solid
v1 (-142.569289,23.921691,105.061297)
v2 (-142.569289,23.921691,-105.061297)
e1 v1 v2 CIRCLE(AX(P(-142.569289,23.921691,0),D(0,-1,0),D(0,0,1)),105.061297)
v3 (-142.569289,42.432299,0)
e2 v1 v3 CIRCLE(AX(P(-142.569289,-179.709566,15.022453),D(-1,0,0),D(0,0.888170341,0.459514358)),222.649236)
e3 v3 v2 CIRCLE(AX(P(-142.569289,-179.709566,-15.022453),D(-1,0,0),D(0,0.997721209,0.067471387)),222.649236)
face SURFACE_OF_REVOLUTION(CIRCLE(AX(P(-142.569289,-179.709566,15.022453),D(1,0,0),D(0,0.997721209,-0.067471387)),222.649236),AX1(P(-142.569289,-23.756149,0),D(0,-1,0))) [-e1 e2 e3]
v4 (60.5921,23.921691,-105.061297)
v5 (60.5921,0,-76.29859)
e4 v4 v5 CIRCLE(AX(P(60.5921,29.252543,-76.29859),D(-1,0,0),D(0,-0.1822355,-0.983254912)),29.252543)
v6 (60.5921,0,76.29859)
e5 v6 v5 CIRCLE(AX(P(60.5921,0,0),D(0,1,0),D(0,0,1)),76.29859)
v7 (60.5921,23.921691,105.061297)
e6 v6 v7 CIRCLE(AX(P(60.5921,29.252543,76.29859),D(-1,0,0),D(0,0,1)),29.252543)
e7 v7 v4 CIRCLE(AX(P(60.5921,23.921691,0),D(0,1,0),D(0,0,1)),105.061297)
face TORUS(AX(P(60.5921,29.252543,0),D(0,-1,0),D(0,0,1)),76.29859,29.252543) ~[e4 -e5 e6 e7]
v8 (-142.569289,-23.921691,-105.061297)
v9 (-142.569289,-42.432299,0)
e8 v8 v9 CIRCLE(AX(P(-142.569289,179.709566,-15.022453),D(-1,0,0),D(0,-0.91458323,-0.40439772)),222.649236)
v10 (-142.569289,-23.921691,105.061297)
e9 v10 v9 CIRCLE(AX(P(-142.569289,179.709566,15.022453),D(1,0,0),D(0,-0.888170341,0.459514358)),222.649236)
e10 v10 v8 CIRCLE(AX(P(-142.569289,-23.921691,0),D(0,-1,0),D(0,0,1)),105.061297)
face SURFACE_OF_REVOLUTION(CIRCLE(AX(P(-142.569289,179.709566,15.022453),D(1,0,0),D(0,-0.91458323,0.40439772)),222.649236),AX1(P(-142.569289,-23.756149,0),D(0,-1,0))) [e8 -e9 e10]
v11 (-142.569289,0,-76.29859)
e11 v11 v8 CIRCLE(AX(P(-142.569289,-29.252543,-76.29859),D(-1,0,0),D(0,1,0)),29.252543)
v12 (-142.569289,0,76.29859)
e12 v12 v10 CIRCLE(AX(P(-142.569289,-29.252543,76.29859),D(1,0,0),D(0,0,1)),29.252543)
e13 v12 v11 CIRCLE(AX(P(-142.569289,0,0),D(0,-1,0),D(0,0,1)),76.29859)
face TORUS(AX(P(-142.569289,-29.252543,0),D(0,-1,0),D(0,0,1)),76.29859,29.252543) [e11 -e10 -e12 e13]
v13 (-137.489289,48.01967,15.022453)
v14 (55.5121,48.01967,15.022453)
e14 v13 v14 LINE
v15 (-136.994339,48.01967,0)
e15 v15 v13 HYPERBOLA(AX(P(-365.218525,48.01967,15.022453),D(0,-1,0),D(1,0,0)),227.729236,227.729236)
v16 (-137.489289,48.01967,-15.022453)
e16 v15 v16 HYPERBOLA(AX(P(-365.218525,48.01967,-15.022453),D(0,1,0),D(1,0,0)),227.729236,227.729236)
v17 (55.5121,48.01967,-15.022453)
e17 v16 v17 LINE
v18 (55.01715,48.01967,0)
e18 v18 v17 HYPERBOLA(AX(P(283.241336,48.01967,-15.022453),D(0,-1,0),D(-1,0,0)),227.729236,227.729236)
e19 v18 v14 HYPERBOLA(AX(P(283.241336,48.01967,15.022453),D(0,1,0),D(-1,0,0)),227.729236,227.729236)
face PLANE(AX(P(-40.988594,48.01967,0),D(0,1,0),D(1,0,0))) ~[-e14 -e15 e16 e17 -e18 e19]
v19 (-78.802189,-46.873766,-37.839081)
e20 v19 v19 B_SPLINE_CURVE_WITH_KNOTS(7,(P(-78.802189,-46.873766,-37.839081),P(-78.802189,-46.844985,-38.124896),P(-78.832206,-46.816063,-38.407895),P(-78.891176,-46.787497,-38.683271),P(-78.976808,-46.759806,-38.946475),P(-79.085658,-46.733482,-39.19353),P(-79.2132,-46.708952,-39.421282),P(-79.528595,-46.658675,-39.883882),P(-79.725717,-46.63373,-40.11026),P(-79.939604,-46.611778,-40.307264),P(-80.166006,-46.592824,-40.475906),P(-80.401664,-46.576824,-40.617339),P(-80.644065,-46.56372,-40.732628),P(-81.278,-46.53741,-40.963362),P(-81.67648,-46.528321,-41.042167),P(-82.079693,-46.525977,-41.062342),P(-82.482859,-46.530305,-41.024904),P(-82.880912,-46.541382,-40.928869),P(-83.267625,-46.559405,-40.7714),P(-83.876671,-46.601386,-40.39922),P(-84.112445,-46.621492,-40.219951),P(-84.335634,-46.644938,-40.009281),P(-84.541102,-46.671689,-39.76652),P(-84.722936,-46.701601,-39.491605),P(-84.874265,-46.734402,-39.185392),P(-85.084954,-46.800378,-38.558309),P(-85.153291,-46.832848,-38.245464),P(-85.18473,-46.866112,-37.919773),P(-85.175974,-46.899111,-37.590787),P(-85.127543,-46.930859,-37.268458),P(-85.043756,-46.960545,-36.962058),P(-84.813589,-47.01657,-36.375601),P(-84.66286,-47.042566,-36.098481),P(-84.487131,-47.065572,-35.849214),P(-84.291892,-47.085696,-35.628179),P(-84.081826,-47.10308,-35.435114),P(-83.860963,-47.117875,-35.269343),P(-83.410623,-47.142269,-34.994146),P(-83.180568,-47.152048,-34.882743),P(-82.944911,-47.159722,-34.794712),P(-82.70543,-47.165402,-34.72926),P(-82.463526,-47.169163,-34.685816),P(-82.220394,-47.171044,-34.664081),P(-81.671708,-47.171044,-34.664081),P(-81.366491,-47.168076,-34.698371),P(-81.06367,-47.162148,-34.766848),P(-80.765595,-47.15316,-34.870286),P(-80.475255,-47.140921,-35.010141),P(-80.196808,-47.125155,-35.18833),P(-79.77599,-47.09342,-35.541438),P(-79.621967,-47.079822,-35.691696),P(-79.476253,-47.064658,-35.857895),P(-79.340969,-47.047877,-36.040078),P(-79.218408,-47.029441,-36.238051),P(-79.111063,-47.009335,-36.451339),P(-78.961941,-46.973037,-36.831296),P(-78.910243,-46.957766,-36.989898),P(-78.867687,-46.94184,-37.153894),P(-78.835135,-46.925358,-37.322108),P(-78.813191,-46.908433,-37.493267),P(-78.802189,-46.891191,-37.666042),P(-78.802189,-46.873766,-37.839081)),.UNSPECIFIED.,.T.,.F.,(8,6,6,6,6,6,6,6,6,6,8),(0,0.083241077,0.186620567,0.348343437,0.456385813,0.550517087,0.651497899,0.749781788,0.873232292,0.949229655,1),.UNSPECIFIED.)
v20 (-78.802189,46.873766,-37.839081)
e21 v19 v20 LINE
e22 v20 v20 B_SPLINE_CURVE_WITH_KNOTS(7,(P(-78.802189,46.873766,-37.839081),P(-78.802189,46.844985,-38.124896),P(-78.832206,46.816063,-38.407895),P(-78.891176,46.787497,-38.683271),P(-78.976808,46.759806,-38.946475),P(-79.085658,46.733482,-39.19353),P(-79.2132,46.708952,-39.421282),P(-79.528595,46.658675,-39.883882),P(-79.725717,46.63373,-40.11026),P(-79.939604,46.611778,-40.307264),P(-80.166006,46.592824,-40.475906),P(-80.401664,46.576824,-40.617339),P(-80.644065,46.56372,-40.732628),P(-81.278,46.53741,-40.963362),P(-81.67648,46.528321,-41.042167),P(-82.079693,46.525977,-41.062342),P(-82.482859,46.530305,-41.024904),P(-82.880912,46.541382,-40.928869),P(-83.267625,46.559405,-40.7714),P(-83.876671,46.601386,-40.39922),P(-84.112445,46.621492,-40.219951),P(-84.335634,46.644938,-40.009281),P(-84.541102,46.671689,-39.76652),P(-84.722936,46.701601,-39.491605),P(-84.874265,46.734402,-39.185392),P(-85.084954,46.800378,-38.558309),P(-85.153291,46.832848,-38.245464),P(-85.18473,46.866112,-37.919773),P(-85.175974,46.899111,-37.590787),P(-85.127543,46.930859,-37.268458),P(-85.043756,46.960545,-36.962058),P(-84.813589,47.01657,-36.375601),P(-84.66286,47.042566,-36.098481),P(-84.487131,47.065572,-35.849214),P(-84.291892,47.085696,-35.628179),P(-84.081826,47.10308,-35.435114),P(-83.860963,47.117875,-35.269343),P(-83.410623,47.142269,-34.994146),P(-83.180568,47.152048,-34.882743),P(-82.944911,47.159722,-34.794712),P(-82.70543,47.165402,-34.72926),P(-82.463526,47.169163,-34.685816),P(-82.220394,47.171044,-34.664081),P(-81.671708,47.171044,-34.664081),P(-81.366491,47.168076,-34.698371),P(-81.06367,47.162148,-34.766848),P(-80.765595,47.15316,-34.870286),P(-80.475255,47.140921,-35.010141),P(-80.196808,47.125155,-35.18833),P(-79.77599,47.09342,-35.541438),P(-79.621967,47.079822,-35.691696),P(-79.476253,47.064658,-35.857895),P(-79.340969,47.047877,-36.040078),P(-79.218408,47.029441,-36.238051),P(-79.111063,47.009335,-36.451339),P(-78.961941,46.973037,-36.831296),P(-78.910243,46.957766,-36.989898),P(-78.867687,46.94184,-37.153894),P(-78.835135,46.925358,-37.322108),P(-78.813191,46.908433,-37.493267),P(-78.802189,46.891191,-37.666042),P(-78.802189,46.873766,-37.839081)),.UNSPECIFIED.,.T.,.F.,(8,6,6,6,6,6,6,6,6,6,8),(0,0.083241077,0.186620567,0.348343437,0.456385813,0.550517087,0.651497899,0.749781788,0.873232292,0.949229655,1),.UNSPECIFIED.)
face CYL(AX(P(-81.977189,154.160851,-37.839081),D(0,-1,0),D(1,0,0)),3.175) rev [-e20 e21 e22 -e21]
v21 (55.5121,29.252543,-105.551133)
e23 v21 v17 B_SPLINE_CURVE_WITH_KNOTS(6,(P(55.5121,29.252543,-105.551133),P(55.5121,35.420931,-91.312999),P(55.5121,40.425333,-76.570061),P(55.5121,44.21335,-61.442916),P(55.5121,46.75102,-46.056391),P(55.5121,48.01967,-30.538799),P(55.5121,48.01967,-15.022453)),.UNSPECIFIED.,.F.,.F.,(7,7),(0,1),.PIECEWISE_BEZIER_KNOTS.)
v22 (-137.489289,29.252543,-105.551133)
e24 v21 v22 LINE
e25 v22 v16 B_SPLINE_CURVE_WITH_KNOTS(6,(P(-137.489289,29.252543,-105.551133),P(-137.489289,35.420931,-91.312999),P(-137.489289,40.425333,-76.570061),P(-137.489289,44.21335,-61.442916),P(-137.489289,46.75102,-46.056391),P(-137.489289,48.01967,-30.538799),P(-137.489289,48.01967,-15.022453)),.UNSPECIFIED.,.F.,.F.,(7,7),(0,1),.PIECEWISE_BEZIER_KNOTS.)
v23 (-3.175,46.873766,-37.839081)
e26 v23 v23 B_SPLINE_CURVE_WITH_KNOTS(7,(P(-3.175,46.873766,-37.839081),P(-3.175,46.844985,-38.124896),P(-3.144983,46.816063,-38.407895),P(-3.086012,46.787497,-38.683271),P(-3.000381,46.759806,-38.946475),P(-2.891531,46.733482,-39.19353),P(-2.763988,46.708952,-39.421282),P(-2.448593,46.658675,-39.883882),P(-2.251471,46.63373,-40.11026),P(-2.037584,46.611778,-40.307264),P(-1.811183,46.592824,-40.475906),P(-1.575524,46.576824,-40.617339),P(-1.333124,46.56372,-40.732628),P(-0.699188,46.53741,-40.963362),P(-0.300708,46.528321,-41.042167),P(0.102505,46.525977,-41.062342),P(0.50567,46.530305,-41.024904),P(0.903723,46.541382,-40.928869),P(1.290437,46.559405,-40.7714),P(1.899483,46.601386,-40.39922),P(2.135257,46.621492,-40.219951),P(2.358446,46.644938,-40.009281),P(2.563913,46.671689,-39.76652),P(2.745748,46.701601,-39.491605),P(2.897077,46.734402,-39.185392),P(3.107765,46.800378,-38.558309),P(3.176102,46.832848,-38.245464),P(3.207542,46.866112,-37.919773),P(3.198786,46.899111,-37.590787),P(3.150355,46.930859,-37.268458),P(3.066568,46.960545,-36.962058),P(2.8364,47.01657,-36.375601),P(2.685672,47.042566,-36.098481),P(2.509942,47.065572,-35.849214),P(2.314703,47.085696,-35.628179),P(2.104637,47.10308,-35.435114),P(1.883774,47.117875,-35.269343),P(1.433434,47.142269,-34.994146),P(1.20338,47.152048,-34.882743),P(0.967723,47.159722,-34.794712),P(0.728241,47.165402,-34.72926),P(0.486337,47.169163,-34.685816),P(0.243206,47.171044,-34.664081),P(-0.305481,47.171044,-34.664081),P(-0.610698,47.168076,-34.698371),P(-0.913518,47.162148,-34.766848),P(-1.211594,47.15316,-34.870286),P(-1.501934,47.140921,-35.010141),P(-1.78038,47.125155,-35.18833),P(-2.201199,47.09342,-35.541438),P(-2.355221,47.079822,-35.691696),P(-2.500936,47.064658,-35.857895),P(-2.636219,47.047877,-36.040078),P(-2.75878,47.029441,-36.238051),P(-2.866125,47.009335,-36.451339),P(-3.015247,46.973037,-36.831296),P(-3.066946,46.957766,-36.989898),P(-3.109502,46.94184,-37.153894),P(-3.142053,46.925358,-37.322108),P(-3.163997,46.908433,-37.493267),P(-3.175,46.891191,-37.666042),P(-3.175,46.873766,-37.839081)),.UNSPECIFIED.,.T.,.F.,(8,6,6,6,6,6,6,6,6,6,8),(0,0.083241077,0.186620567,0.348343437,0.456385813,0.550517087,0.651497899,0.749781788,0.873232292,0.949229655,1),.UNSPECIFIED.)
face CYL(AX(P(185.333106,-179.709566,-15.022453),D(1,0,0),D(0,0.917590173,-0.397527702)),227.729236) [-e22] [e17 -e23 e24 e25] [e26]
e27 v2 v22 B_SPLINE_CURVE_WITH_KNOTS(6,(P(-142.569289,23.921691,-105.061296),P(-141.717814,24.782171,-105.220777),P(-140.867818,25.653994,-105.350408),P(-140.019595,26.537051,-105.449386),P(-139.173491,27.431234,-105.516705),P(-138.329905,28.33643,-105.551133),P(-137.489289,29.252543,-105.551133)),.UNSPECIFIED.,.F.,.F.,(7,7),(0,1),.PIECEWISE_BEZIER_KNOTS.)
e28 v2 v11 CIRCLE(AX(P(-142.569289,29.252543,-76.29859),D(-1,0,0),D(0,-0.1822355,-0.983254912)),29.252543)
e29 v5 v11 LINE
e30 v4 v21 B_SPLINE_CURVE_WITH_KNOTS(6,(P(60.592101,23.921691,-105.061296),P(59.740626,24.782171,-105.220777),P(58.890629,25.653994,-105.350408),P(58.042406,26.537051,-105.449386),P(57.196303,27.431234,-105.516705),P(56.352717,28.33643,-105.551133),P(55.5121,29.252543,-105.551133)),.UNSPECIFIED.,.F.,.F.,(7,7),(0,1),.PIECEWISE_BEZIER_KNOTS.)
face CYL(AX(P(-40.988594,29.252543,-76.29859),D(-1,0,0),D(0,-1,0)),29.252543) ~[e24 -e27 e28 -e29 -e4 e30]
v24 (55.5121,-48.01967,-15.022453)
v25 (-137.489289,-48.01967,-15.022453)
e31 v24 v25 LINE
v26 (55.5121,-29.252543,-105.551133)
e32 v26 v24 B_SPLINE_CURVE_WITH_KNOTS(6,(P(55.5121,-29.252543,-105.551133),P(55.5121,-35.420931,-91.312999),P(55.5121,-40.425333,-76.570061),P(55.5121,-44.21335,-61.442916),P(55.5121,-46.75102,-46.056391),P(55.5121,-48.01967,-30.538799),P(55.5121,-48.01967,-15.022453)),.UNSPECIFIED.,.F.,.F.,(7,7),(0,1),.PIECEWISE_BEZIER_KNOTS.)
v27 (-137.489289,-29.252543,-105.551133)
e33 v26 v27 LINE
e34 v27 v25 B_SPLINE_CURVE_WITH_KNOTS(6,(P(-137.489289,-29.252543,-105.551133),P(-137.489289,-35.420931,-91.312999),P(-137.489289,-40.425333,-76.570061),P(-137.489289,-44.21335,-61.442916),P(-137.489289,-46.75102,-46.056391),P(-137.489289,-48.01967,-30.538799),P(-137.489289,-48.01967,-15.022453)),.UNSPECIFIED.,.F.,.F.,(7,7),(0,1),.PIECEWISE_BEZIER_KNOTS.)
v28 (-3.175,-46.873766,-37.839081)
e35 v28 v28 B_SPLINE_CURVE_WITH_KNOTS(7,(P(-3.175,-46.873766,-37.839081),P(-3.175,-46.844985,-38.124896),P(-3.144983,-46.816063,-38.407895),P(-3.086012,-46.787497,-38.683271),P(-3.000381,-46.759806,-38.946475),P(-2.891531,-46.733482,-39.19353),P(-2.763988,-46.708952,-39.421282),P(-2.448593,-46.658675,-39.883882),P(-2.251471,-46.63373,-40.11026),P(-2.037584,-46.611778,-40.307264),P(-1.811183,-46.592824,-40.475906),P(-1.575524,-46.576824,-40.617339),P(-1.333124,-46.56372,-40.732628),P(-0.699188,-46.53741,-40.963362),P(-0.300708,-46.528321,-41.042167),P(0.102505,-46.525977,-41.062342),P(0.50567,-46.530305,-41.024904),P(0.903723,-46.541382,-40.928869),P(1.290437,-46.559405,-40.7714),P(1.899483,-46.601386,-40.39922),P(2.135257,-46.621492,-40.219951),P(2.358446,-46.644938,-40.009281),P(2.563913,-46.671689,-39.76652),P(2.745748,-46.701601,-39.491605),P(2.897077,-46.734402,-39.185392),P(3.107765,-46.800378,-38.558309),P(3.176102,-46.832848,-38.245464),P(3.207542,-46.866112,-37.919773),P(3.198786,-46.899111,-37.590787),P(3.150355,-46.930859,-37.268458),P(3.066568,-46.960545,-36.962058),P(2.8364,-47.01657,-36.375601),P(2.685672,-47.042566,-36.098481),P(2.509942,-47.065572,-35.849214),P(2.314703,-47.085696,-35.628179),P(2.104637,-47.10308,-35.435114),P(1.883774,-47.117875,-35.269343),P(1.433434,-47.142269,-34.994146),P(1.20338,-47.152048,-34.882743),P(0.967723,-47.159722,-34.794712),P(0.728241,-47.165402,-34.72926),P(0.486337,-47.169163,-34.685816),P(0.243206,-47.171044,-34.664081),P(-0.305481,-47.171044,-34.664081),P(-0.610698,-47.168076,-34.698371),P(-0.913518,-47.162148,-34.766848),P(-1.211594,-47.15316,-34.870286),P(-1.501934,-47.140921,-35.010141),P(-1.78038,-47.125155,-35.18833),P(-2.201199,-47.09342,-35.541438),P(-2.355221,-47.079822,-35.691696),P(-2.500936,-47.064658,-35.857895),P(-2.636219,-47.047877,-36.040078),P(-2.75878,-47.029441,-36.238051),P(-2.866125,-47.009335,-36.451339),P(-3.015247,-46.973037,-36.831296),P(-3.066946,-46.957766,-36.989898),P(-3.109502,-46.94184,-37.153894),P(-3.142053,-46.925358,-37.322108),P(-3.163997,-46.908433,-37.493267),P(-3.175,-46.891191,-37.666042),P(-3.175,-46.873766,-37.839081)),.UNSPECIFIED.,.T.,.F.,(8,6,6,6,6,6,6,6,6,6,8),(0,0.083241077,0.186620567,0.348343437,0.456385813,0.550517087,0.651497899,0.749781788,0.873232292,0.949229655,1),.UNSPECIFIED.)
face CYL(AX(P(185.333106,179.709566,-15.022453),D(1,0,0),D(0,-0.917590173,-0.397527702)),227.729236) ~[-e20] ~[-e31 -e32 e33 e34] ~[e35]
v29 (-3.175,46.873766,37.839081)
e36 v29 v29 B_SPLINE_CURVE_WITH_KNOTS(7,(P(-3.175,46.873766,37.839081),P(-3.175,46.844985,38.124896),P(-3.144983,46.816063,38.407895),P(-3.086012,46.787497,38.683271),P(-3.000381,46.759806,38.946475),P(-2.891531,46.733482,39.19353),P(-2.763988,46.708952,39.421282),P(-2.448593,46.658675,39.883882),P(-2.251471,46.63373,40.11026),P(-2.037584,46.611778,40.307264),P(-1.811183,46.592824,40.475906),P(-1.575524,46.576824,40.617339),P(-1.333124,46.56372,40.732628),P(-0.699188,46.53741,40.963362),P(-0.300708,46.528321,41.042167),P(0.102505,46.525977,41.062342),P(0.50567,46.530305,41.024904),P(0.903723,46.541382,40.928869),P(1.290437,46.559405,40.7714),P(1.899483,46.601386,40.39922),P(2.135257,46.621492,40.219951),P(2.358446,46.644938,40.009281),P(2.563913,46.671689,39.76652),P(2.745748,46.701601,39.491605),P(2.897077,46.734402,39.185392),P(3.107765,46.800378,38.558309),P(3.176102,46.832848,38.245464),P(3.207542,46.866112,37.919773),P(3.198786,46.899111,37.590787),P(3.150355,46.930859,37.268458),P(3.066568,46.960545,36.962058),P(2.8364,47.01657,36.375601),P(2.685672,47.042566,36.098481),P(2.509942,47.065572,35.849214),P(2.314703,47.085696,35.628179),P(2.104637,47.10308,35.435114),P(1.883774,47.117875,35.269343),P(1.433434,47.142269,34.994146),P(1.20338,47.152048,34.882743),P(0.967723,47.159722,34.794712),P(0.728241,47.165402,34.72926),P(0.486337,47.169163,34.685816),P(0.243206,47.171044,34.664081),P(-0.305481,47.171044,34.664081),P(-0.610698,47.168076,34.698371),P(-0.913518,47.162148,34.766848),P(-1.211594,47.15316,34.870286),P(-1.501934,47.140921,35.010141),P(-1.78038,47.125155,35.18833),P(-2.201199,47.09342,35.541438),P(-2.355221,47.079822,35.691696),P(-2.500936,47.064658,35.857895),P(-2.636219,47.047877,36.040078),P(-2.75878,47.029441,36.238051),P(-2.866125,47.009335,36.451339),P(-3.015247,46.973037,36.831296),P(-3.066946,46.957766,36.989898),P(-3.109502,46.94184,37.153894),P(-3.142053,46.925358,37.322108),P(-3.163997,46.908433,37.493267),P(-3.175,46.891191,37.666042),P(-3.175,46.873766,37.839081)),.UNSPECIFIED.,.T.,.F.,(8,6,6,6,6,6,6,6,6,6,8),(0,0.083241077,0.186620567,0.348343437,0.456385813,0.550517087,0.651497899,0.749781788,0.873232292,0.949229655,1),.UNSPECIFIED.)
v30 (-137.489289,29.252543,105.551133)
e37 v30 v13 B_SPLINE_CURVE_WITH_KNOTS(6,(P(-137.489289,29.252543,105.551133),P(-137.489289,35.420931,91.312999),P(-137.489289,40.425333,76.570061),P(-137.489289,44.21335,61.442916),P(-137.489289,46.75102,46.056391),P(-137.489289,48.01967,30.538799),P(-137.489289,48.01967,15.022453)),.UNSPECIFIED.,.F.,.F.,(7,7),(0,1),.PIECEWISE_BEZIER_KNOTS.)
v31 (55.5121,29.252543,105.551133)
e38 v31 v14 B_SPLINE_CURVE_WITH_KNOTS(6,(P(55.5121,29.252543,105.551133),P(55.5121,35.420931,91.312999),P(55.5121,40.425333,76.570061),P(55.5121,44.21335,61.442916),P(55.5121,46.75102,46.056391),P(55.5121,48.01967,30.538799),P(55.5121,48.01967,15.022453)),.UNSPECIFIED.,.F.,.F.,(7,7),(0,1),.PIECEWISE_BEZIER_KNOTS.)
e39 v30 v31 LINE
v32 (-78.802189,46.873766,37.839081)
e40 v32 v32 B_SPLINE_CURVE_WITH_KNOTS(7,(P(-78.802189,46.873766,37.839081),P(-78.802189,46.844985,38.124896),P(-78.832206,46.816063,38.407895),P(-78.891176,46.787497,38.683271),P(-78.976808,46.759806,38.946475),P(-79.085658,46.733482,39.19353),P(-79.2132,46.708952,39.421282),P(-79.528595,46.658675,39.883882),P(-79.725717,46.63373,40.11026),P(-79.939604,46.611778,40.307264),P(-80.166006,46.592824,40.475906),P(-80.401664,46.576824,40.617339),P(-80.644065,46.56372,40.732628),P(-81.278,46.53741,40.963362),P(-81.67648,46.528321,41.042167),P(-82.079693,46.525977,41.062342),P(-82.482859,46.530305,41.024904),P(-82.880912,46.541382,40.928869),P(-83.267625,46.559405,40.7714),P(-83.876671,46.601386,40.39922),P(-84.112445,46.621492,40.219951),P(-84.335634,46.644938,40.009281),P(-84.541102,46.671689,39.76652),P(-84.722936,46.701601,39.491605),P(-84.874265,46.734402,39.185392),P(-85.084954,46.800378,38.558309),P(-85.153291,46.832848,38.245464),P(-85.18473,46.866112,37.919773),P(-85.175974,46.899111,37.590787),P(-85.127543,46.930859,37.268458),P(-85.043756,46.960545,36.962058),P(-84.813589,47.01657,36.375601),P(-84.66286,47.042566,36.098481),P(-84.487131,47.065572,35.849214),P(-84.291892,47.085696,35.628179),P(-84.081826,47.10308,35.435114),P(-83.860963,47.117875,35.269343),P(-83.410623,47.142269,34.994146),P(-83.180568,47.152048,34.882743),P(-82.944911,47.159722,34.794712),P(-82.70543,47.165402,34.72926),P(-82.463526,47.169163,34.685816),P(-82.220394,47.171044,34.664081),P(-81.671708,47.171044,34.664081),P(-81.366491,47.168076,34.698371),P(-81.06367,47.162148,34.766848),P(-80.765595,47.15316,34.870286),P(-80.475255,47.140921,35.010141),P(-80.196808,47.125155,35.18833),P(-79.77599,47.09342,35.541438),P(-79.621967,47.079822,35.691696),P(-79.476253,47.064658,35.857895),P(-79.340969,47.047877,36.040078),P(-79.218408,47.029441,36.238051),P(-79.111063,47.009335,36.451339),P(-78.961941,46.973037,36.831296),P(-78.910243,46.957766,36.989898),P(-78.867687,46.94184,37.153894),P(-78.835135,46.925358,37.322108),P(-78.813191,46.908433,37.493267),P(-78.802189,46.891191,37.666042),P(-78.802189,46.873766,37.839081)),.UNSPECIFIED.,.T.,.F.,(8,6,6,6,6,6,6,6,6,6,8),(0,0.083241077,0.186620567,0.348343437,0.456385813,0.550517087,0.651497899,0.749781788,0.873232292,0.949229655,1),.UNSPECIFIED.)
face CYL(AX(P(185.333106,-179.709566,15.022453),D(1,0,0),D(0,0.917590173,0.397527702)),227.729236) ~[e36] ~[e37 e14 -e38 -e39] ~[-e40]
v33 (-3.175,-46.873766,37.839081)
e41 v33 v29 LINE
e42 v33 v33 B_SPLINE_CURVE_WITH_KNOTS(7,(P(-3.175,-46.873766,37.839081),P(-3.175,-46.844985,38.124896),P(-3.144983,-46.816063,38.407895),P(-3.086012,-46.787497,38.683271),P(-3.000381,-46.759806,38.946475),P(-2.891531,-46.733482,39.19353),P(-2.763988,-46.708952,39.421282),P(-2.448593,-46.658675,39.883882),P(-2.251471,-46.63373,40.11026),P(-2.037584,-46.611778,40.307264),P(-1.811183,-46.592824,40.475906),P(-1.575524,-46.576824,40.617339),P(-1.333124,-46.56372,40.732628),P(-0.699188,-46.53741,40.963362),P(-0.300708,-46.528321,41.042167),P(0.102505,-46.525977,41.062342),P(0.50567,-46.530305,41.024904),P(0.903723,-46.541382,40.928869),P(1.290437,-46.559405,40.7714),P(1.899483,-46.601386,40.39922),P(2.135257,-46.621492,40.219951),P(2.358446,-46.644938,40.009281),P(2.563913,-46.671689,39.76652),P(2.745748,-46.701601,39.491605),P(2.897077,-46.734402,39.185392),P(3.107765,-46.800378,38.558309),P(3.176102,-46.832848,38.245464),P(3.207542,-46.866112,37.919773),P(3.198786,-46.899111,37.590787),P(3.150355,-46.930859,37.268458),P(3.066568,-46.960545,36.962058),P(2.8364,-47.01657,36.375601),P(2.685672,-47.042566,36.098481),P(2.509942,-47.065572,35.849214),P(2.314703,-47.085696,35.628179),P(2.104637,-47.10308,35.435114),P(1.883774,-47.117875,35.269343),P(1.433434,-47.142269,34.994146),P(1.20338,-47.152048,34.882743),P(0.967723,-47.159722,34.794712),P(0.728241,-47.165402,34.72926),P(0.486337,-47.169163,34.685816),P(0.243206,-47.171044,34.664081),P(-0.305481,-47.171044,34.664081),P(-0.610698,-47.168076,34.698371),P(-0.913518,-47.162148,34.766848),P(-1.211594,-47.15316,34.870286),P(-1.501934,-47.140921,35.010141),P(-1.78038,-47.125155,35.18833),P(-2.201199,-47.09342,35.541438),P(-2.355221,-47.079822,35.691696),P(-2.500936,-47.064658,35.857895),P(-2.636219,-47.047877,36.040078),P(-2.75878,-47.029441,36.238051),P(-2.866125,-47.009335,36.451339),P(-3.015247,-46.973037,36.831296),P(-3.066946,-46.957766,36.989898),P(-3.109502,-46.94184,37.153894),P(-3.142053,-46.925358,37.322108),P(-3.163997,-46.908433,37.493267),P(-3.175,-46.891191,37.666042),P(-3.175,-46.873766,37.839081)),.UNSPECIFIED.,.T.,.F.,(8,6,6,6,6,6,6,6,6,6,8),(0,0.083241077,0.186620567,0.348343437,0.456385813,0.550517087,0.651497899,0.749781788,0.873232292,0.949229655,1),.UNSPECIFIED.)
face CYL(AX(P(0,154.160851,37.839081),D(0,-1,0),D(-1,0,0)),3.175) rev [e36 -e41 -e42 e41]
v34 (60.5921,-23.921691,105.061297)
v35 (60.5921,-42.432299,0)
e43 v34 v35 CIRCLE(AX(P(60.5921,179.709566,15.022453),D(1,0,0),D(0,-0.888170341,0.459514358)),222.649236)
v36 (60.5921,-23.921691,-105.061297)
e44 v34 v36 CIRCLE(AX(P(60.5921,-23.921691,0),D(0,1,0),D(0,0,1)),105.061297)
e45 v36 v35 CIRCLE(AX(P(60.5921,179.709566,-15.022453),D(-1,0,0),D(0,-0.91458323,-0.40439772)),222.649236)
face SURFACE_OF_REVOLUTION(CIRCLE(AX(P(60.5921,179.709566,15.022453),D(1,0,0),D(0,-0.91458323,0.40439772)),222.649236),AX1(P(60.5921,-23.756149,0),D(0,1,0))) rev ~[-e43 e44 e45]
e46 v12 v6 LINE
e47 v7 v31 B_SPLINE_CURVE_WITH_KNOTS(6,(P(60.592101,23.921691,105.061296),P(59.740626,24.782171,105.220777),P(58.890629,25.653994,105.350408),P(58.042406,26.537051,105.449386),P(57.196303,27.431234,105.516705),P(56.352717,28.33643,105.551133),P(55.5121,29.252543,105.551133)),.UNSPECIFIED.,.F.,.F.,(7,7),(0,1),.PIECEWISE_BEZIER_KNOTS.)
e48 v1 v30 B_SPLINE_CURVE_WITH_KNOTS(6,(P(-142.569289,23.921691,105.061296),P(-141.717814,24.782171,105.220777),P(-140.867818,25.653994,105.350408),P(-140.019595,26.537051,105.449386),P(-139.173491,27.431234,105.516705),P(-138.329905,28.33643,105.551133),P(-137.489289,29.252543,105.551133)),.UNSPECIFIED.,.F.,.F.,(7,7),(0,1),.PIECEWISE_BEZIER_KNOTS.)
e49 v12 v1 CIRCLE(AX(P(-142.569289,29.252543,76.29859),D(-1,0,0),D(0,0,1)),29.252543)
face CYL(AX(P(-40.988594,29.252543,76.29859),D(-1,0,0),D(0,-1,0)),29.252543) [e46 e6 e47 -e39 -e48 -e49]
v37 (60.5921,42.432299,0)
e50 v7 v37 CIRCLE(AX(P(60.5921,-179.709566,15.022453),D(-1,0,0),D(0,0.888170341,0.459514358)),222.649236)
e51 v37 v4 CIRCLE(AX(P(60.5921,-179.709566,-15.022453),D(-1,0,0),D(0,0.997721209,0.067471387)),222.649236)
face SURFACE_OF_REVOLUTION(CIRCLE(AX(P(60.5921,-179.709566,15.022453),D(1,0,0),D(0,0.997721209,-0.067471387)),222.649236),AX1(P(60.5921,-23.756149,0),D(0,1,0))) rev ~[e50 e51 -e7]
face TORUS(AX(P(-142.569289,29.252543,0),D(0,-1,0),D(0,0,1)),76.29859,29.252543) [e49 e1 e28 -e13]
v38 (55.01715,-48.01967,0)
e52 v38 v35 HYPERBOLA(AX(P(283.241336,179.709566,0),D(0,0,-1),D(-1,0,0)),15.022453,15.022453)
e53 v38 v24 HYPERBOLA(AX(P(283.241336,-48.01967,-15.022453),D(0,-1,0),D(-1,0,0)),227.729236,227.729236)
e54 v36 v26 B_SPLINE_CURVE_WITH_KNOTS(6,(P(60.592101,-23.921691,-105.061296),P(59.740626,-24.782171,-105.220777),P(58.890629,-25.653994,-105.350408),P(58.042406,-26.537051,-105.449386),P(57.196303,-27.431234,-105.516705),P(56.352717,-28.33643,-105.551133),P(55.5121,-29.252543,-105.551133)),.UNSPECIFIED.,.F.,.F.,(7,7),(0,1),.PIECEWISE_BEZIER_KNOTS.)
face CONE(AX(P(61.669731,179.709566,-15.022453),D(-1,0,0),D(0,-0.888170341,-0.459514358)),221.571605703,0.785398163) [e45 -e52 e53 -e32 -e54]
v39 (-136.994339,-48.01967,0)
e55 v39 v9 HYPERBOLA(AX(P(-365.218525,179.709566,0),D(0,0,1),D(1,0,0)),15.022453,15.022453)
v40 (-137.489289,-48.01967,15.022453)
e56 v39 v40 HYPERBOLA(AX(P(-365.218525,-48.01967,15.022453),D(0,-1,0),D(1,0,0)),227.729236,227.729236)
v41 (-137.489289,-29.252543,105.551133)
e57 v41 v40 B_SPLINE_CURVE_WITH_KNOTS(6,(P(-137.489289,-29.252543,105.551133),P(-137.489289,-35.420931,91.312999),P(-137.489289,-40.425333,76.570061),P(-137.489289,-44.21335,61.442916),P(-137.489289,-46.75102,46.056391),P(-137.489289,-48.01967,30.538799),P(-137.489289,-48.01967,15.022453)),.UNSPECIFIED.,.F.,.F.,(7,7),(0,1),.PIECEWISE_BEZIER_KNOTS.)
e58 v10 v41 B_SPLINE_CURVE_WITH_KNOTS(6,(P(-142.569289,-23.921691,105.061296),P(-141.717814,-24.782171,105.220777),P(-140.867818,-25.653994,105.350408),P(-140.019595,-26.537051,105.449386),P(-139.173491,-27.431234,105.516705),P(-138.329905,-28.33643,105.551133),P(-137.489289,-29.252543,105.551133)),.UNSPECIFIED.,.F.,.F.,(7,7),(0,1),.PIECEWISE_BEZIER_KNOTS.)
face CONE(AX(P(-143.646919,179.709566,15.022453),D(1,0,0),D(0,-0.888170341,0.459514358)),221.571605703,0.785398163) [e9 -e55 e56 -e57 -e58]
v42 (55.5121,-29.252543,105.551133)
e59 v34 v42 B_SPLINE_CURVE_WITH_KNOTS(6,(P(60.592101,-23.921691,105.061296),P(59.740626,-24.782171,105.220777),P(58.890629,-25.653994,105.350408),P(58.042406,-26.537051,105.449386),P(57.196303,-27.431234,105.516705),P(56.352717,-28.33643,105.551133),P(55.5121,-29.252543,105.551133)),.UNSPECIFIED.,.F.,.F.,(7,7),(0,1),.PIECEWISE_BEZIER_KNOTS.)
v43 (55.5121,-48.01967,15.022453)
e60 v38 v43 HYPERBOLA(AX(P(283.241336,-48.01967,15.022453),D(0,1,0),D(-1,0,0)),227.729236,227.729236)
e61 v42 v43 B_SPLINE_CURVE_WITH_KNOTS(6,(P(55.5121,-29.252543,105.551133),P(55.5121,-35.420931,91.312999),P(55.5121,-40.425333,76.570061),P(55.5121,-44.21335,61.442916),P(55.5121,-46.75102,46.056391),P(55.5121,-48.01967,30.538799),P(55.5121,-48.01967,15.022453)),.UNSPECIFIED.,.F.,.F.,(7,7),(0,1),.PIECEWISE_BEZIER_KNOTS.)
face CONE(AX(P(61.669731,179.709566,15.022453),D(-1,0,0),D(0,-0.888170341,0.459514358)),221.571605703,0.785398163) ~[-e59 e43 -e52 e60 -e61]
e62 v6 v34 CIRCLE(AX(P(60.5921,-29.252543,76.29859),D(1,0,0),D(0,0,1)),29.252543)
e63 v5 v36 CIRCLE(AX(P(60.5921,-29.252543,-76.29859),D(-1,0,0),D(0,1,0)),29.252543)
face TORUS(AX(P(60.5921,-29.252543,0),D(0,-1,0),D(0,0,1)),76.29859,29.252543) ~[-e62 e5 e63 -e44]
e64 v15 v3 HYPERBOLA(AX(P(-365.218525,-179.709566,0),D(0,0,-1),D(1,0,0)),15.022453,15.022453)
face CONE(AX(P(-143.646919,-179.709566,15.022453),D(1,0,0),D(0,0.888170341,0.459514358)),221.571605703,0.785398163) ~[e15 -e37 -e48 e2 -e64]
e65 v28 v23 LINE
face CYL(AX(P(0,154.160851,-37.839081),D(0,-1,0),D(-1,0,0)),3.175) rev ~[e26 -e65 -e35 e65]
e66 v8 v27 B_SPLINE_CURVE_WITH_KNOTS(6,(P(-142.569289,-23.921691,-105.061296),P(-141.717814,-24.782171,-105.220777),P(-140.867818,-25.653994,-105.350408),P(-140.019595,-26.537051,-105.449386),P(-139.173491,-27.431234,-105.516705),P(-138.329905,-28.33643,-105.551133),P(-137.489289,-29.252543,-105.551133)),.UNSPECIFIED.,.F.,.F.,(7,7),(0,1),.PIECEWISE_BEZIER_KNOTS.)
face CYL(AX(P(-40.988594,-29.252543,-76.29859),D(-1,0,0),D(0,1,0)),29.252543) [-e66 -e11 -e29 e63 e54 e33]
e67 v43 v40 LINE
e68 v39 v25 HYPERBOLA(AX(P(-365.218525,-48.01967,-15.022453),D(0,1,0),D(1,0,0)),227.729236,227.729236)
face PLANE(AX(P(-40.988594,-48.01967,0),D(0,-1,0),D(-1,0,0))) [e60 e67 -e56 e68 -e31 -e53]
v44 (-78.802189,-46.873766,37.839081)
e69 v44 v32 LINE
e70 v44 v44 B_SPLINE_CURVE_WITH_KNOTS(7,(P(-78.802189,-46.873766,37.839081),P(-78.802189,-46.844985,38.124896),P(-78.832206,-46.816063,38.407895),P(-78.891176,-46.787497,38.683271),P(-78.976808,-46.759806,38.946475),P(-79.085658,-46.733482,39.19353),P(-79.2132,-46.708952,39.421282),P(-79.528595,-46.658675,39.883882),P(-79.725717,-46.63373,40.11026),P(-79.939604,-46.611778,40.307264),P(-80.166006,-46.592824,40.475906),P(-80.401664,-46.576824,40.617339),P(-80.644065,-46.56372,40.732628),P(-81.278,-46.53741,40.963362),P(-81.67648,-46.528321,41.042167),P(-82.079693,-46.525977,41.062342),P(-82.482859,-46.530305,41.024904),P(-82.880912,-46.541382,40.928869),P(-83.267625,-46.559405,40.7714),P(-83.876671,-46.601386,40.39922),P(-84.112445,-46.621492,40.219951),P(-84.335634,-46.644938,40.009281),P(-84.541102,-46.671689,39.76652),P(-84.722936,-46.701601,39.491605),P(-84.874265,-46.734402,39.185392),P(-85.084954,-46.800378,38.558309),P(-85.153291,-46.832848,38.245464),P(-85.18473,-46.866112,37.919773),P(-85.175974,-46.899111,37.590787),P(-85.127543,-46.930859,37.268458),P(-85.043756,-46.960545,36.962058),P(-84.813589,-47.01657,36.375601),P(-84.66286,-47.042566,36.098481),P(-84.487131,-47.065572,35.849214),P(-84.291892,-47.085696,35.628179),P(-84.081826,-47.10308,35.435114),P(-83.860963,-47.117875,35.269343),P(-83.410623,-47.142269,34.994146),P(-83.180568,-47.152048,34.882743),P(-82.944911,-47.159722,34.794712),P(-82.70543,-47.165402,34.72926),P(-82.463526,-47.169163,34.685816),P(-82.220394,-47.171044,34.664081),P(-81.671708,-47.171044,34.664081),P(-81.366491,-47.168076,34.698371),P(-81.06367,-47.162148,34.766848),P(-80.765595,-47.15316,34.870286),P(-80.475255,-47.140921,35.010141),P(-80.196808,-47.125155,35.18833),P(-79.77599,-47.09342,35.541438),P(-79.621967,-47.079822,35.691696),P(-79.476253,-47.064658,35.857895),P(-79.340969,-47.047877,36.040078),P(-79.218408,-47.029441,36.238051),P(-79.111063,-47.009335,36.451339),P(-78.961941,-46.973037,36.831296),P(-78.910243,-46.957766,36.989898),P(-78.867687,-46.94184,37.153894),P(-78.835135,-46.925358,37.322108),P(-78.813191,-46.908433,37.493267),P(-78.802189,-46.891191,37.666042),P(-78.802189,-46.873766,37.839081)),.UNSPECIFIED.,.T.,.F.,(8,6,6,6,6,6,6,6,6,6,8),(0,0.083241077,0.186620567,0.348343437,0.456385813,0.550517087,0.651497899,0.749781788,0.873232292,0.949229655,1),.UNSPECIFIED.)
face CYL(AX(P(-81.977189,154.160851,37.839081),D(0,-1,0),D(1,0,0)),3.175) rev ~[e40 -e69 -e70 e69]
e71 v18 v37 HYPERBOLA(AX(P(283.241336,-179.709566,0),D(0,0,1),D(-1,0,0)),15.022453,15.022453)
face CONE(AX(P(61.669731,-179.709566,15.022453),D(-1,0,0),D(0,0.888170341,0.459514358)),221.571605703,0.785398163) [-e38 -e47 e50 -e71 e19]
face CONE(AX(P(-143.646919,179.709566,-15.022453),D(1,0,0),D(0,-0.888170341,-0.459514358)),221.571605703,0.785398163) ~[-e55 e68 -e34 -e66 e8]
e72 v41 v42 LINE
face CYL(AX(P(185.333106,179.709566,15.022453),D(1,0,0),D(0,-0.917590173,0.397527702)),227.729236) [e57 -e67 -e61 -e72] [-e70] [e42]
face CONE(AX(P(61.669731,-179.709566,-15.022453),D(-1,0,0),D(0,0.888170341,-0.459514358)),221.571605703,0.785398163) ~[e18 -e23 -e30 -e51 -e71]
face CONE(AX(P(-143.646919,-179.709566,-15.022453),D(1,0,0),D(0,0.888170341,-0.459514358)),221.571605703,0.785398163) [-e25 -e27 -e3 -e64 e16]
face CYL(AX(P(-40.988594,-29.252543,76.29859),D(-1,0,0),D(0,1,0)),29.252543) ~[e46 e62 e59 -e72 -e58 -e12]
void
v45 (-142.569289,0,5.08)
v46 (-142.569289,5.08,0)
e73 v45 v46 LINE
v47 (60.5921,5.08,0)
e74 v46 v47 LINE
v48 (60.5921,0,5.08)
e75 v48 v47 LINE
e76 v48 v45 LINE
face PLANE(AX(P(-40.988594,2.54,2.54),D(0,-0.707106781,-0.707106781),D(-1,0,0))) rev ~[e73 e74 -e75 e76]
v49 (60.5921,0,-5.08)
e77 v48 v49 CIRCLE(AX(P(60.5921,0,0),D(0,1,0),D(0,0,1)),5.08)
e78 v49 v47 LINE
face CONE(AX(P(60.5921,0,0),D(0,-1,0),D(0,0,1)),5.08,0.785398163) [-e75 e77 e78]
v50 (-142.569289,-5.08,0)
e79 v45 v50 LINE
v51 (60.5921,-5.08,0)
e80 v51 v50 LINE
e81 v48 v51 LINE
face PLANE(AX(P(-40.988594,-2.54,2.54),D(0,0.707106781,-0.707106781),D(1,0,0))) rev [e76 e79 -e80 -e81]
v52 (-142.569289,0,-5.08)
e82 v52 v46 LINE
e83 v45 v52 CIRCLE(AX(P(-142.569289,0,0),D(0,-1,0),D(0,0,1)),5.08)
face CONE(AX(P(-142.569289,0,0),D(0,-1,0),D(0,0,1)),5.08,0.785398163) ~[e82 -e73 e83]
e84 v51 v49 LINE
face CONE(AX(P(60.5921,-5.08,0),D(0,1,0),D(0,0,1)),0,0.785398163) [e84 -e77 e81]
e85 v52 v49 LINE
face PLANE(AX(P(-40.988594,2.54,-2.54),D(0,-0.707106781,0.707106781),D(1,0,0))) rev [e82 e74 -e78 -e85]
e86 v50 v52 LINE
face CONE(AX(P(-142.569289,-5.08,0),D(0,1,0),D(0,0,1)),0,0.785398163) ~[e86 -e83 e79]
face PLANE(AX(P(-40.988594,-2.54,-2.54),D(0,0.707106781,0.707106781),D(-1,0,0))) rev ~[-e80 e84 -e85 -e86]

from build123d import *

# Parameters (mm, degrees)
F0_W        = 101.5806943178
F0_H        = 48.01966995
F1_DEPTH    = 105.5511329323
F2_R        = 29.2525430431
F3_T1_DEPTH = 554.2240944956
F4_SIZE     = 5.08
F5_T2_ANGLE = 31.2878347999
F7_D        = 6.35
F9_ANGLE    = 180


# Not quite as in the source:
# - a fillet or chamfer that OpenCascade refuses, or shapes differently, is made with other operations: its cross-section is extruded or revolved along the edge and cut away or added


with BuildPart() as f1:
    # F0 (on Top) → F1 (new body)
    with BuildSketch(Plane.XY):
        with Locations((9.8017528653, 24.009834975)):
            Rectangle(F0_W, F0_H)
    extrude(amount=F1_DEPTH)

    # F2
    f2_edges = [f1.edges().sort_by_distance(p)[0] for p in [
        (9.801753, 0, 105.551133),
    ]]
    fillet(f2_edges, radius=F2_R)

    # F3: fillet of radius 227.7292364389 on 1 edges, made by hand

    # F3_s2 → F3_t1 (cut)
    with BuildSketch(Plane.YZ.offset(-267.3102943825)):
        with BuildLine():
            ThreePointArc((29.2525430431, 105.5511329323), (43.2785349621, 61.2491955933), (48.01966995, 15.0224528968))
            Line((48.01966995, 15.0224528968), (48.01966995, 105.5511329323))
            Line((48.01966995, 105.5511329323), (29.2525430431, 105.5511329323))
        make_face()
    extrude(amount=F3_T1_DEPTH, mode=Mode.SUBTRACT)

    # F4
    f4_edges = [f1.edges().sort_by_distance(p)[0] for p in [
        (9.801753, 0, 0),
    ]]
    chamfer(f4_edges, length=F4_SIZE)

    # F5: chamfer of 5.08 on 1 edges, made by hand

    # F5_s1 → F5_t2 (revolve, cut)
    with BuildSketch(Plane(origin=(0, -44.077363084, 85.1947407747), x_dir=(1, 0, 0), z_dir=(0, -0.4595143579, 0.8881703411))):
        with BuildLine():
            Line((61.6697307588, 68.8619315298), (54.4344692897, 76.0971929988))
            Line((54.4344692897, 76.0971929988), (54.4344692897, 76.8591929988))
            ThreePointArc((54.4344692897, 76.8591929988), (57.513284657, 75.7815622643), (60.5921000242, 75.7815622643))
            Line((60.5921000242, 75.7815622643), (61.3541000242, 75.0195622643))
            ThreePointArc((61.3541000242, 75.0195622643), (61.3541000242, 71.9407468971), (62.4317307588, 68.8619315298))
            Line((62.4317307588, 68.8619315298), (61.6697307588, 68.8619315298))
        make_face()
    revolve(axis=Axis((60.5921000242, -179.7095664878, 15.022452897), (-1, 0, 0)), revolution_arc=F5_T2_ANGLE, mode=Mode.SUBTRACT)

    # F7 (through all)
    with Locations(Plane.XZ):
        with Locations((0, 37.8390811384)):
            Hole(F7_D / 2)

    # F8: F1 across plane


with BuildPart() as f1_1:
    add(f1.part)
    add(f1.part.mirror(Plane.XZ))

    # F8_face (on face) → F9 (revolve)
    with BuildSketch(Plane(origin=(60.5921000242, 0, 46.1455237947), x_dir=(0, 1, 0), z_dir=(1, 0, 0))):
        with BuildLine():
            Line((0, -41.0655237947), (5.08, -46.1455237947))
            Line((5.08, -46.1455237947), (42.432298984, -46.1455237947))
            ThreePointArc((42.432298984, -46.1455237947), (39.5623129602, 7.5101449883), (23.9216912378, 58.9157727391))
            ThreePointArc((23.9216912378, 58.9157727391), (6.7619645003, 48.8582833159), (0, 30.1530660945))
            ThreePointArc((0, 30.1530660945), (-6.7619645003, 48.8582833159), (-23.9216912378, 58.9157727391))
            ThreePointArc((-23.9216912378, 58.9157727391), (-39.5623129602, 7.5101449883), (-42.432298984, -46.1455237947))
            Line((-42.432298984, -46.1455237947), (-5.08, -46.1455237947))
            Line((-5.08, -46.1455237947), (0, -41.0655237947))
        make_face()
    revolve(axis=Axis((60.5921000242, -23.756149492, 0), (0, 1, 0)), revolution_arc=F9_ANGLE)

    # F10: F1 across face


with BuildPart() as f1_2:
    add(f1_1.part)
    add(f1_1.part.mirror(Plane(origin=(9.6264102551, 26.4795740308, 0), x_dir=(1, 0, 0), z_dir=(0, 0, -1))))

    # F11: F1 across face


with BuildPart() as f1_3:
    add(f1_2.part)
    add(f1_2.part.mirror(Plane(origin=(-40.9885942936, 0, 0), x_dir=(0, -1, 0), z_dir=(-1, 0, 0))))


solid = f1_3.part
